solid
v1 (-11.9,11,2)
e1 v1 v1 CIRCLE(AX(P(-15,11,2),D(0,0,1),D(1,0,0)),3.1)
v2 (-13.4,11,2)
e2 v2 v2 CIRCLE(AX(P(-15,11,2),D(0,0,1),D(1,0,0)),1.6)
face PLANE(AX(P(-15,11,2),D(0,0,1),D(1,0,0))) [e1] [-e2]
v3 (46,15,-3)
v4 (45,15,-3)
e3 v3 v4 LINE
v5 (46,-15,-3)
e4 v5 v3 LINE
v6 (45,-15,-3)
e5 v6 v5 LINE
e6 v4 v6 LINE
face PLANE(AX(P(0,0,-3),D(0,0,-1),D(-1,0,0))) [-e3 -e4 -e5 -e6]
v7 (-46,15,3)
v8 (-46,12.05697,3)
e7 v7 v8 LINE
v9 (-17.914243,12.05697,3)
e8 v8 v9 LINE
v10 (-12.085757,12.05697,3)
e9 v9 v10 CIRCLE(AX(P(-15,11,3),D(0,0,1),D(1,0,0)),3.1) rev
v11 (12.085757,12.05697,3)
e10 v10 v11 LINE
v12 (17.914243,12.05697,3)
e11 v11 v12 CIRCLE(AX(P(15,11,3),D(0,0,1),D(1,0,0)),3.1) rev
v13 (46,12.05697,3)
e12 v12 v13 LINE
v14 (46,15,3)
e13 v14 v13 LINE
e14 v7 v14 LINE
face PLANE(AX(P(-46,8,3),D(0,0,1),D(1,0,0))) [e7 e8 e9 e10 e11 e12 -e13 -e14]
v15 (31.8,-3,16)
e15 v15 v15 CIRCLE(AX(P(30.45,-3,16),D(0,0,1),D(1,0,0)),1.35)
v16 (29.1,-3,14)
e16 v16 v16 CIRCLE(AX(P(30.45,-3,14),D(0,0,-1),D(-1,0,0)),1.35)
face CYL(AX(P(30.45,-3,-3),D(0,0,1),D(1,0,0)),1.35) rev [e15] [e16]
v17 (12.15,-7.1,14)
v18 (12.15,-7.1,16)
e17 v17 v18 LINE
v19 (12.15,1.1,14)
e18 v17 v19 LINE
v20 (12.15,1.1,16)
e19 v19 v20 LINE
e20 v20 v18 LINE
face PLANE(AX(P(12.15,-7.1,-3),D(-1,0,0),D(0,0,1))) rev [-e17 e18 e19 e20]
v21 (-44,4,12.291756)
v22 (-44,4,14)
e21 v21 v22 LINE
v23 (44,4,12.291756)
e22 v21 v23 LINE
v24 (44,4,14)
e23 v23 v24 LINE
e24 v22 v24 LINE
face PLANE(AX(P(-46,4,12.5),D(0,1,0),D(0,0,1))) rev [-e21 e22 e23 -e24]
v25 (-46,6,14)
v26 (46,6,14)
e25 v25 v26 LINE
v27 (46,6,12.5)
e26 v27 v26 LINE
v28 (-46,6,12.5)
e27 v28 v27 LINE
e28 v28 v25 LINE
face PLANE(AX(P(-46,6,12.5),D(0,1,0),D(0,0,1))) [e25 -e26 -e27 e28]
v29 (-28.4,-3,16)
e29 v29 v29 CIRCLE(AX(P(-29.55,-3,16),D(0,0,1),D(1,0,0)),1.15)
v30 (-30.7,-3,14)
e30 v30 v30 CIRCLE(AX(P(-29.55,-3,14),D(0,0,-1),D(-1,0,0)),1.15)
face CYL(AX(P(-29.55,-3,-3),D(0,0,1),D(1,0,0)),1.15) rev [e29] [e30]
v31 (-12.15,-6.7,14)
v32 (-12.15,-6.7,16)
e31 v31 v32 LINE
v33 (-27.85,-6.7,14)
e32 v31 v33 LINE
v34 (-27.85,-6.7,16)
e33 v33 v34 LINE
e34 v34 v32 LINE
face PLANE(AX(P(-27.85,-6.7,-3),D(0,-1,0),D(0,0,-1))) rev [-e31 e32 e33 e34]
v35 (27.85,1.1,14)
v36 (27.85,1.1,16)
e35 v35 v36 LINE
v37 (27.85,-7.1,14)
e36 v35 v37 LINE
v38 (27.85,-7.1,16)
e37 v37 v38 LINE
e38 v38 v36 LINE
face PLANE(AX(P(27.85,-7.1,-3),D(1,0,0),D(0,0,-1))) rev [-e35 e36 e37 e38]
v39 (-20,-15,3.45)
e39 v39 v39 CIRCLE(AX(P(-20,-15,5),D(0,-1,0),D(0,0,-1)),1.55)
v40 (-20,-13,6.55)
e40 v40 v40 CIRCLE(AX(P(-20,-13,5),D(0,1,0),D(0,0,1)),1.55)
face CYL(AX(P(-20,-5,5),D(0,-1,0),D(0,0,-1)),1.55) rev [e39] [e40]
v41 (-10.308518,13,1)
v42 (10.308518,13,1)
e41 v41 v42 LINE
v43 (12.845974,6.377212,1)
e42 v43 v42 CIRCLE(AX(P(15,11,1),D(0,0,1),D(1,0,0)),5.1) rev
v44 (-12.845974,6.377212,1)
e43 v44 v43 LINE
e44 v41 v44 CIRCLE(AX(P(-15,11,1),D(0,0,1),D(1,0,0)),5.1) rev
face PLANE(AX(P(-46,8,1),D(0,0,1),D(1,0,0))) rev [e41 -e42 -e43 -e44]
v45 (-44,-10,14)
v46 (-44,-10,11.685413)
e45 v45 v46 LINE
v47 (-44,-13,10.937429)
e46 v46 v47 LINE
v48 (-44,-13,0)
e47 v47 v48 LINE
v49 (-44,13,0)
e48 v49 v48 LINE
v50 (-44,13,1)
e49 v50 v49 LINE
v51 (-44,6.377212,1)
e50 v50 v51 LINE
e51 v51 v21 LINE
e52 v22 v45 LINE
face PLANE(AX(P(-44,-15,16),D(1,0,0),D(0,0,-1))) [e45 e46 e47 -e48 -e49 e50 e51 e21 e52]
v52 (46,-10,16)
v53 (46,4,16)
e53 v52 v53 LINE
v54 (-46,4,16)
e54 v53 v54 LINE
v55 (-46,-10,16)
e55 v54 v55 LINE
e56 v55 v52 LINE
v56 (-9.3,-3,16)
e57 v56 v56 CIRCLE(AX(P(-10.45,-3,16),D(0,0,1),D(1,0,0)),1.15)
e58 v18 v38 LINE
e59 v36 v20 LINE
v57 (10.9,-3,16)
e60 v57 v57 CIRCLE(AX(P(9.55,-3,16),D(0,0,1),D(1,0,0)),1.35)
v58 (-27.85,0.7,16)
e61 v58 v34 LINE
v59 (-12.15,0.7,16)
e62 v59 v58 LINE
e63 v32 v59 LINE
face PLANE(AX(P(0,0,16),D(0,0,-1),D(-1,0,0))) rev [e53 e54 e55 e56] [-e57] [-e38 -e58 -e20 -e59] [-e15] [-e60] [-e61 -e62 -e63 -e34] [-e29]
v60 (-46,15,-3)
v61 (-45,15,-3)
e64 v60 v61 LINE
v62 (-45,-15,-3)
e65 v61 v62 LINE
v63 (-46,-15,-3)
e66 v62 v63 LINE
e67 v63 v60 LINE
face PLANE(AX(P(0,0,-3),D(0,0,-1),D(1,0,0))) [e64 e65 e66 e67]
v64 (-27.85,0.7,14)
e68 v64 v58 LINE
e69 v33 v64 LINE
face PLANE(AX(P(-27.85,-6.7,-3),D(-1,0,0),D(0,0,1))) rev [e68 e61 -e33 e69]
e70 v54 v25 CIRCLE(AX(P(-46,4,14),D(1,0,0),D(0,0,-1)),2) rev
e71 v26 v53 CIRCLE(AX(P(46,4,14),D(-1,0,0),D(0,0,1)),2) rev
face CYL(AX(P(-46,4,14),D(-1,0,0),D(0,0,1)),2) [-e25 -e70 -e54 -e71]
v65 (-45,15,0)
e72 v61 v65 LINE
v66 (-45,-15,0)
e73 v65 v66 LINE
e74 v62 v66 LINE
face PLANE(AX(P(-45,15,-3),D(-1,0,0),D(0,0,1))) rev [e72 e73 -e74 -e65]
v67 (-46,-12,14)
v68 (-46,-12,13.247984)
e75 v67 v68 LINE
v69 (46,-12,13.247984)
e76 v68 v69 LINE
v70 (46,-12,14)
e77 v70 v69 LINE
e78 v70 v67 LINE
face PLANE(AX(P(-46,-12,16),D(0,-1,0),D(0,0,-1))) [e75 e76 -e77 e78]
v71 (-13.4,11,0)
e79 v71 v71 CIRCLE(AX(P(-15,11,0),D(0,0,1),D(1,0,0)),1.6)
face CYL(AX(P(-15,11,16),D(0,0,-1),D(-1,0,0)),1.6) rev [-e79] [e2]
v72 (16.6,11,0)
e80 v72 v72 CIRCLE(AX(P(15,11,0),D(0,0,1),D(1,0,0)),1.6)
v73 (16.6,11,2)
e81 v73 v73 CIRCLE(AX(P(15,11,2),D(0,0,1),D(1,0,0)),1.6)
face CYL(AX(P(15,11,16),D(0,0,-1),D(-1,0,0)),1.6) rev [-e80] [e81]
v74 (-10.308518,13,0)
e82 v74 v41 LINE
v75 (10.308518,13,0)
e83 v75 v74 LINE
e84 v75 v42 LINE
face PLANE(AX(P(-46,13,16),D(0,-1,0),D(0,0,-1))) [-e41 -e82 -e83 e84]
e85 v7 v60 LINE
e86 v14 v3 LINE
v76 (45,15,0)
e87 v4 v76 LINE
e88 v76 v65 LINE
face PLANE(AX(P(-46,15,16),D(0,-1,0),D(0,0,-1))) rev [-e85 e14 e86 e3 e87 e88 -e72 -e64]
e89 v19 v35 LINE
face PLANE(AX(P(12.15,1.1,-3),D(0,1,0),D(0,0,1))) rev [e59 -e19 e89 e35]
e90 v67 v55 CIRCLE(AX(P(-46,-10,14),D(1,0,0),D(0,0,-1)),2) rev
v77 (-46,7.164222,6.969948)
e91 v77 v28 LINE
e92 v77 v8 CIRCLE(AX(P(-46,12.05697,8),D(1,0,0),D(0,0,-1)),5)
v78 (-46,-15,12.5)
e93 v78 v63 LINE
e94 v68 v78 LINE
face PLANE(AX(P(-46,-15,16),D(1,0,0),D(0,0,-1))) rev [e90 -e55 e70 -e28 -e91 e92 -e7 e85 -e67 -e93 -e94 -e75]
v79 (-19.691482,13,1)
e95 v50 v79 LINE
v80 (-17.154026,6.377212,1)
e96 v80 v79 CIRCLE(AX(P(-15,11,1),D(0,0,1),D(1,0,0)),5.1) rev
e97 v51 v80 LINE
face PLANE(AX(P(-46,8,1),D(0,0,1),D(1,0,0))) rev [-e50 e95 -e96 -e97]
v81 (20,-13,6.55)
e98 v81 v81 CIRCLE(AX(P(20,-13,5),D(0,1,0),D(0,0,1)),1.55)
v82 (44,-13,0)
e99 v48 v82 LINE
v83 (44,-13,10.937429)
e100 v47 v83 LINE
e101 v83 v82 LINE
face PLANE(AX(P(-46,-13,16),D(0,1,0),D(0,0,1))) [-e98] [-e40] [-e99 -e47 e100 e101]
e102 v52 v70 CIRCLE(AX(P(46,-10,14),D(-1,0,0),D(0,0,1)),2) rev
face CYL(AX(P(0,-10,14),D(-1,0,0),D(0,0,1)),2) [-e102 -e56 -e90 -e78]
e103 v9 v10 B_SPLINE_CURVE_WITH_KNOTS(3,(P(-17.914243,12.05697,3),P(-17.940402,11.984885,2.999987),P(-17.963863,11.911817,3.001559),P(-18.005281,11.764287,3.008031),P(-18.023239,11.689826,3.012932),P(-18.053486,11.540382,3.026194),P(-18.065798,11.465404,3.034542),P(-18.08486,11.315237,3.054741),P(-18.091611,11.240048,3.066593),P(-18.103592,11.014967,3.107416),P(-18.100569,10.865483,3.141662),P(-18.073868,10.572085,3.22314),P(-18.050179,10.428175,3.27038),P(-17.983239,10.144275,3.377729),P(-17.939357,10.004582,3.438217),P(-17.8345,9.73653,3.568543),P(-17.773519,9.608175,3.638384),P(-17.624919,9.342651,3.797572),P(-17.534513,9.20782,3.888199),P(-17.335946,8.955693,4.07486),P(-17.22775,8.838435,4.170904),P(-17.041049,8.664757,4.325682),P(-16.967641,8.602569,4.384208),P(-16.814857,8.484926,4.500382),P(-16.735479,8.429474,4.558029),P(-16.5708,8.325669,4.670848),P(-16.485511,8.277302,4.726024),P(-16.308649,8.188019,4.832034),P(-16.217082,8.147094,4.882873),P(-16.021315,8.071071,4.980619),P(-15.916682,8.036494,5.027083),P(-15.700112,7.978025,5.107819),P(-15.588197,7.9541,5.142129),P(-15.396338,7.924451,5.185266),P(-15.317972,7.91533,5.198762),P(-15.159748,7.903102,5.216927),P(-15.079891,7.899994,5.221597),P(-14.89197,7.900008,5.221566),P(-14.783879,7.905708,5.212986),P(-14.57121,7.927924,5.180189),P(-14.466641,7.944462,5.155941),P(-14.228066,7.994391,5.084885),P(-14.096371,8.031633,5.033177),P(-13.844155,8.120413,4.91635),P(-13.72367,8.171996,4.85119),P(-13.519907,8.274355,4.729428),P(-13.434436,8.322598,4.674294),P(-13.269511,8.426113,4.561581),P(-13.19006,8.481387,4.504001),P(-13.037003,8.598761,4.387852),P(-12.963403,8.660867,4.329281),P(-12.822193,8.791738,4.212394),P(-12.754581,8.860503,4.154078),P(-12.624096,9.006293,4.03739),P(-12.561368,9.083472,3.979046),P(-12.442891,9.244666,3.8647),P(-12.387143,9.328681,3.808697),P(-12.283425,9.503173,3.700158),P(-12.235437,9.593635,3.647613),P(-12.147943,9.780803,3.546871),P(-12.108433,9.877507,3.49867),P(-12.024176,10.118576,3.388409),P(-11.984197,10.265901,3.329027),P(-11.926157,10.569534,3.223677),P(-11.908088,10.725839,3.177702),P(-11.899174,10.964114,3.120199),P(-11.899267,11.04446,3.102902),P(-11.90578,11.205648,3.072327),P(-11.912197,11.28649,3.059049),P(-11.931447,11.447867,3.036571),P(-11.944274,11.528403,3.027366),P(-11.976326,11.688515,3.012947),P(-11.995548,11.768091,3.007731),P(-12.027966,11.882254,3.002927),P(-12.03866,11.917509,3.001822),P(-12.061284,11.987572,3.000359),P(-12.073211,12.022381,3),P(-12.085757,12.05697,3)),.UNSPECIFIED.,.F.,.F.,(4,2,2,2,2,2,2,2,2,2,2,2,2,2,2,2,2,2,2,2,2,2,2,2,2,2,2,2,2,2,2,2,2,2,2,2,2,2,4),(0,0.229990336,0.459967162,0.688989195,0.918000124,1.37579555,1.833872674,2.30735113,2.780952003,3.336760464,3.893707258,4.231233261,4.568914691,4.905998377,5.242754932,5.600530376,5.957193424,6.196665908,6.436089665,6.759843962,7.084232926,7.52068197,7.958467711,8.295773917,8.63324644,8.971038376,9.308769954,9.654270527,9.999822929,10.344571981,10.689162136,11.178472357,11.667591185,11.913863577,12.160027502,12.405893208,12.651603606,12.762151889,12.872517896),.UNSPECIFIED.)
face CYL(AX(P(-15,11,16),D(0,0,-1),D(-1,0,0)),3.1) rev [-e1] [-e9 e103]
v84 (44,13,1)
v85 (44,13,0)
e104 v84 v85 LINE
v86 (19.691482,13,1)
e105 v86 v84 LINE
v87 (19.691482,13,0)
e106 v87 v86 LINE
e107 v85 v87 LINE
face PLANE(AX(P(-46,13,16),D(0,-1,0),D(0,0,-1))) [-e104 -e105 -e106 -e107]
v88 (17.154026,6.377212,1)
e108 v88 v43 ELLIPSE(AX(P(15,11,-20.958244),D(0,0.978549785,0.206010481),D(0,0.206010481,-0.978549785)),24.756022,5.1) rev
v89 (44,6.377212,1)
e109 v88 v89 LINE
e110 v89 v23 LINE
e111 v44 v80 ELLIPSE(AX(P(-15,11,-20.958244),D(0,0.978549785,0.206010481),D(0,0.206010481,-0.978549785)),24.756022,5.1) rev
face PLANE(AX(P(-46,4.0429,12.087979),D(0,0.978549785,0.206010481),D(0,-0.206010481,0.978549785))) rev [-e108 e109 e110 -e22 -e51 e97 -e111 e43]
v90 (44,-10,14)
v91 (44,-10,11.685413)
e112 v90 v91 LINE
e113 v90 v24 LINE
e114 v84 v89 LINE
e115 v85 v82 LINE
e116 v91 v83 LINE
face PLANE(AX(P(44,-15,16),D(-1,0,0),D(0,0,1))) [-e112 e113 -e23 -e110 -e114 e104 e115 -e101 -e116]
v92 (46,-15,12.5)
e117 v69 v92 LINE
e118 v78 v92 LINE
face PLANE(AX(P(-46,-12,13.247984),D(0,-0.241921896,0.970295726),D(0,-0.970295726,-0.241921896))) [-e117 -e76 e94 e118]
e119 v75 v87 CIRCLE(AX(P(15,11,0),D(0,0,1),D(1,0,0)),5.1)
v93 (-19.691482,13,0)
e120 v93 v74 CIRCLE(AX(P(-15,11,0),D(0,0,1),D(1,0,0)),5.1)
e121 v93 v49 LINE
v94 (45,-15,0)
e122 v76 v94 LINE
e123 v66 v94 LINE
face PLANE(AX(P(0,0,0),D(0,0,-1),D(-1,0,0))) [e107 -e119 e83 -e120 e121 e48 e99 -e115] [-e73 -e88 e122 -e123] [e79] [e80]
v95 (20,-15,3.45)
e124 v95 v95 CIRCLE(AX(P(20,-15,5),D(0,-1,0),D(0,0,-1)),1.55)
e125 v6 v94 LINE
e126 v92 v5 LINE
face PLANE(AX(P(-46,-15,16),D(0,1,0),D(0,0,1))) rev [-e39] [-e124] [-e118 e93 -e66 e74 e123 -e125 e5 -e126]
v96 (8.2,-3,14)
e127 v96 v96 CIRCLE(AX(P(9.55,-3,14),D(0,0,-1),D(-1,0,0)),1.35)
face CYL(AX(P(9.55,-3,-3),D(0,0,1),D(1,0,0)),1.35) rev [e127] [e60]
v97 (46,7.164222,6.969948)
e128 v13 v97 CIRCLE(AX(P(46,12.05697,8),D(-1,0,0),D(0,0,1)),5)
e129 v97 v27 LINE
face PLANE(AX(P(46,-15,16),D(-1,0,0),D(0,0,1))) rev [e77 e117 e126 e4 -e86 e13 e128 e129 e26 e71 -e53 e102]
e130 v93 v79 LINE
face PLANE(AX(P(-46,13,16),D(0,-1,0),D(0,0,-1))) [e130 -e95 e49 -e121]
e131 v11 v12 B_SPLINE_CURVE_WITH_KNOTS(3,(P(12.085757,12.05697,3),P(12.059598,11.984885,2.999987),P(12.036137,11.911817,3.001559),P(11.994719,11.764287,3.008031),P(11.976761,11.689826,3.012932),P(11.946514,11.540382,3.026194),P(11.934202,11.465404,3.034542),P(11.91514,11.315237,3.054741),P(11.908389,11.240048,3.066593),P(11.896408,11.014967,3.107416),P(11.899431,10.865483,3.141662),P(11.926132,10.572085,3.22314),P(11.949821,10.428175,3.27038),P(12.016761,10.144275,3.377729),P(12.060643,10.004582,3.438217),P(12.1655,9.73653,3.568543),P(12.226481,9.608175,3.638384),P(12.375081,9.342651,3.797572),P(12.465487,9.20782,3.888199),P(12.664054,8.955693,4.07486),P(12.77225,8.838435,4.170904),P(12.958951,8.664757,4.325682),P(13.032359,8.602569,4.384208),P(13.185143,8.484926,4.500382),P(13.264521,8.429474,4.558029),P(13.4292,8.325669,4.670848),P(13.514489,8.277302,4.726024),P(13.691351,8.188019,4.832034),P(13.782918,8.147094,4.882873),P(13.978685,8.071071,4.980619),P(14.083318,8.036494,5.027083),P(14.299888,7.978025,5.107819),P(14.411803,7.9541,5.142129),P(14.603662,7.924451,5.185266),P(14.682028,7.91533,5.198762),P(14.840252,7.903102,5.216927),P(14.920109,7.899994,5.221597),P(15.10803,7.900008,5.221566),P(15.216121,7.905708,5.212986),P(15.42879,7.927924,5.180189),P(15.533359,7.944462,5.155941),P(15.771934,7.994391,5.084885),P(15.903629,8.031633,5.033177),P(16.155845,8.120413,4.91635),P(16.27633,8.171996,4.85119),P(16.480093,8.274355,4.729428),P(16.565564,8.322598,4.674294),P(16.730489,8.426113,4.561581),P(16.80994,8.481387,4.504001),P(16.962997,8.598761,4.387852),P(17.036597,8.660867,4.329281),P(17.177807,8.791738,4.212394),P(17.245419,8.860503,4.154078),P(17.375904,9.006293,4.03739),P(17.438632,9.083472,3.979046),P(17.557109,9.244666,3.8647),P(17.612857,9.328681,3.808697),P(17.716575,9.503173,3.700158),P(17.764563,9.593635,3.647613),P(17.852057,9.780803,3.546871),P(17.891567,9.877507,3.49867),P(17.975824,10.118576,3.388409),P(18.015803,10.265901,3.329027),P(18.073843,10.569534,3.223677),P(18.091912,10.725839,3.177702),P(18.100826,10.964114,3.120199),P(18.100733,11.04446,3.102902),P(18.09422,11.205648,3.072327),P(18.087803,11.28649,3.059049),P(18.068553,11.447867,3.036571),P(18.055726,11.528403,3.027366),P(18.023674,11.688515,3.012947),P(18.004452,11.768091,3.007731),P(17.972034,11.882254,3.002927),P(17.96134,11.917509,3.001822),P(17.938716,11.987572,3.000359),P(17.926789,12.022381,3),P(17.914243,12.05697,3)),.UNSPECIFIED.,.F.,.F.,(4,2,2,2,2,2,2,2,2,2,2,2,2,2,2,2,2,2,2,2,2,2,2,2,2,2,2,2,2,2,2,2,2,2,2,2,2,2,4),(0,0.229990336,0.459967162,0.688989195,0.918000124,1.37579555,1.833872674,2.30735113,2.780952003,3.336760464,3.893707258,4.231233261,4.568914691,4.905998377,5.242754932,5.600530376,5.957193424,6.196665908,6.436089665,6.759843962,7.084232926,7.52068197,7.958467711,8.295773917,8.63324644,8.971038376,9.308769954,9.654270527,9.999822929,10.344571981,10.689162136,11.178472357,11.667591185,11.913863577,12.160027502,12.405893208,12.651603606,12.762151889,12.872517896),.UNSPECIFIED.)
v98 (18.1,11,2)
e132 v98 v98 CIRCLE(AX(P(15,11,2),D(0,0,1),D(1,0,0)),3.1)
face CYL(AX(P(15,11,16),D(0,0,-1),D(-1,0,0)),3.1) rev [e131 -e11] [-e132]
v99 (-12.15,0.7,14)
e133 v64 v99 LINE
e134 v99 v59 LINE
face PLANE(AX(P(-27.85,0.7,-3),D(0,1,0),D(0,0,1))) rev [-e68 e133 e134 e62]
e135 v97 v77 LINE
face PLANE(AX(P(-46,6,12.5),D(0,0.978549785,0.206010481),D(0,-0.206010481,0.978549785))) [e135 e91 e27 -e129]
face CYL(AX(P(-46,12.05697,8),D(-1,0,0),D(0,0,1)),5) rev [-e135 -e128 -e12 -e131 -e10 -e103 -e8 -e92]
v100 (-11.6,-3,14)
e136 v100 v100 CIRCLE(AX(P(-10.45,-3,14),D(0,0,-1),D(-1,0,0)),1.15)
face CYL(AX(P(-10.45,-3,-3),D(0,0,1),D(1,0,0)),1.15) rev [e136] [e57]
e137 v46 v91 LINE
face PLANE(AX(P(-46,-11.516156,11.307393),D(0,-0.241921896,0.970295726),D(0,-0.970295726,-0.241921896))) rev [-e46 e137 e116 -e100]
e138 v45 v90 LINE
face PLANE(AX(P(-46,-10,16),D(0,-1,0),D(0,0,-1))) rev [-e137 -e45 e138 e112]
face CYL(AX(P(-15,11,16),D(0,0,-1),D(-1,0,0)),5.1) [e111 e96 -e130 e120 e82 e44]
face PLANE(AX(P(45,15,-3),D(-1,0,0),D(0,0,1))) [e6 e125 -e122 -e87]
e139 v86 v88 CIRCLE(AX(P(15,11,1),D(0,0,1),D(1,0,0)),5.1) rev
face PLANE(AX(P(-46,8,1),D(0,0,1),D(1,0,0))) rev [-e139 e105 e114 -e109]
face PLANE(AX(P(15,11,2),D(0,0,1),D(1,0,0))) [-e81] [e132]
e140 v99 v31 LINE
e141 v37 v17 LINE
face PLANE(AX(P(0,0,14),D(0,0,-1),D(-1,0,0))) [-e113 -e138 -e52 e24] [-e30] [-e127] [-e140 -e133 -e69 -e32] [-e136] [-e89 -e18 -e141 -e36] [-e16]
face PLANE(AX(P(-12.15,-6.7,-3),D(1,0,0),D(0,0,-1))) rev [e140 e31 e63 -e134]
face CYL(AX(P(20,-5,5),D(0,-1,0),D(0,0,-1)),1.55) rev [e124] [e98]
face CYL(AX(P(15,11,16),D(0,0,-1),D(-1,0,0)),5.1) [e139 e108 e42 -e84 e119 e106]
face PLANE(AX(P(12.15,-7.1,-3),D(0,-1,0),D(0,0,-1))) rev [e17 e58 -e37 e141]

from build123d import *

# Parameters (mm, degrees)
SKETCH2_W               = 92
SKETCH2_H               = 30
BOSS_EXTRUDE1_DEPTH     = 16
SKETCH3_W               = 1
SKETCH3_H               = 30
BOSS_EXTRUDE2_DEPTH     = 3
SKETCH6_OUTSIDE_W       = 40.724
SKETCH6_OUTSIDE_H       = 51.724
CUT_EXTRUDE1_DEPTH      = 95.578010129
SKETCH7_R               = 1.6
CUT_EXTRUDE2_DEPTH      = 51.960769225
CUT_EXTRUDE3_DEPTH      = 51.0999002
CUT_EXTRUDE3_DEPTH_BACK = 1
SKETCH8_R               = 3.1
SHELL3_OUTLINE_W        = 88
SHELL3_OUTLINE_H        = 14
SHELL3_DEPTH            = 14
SHELL3_2_OUTLINE_W      = 88
SHELL3_2_OUTLINE_H      = 3
SHELL3_2_DEPTH          = 10.937428747
SHELL3_3_DEPTH          = 1
SHELL3_START            = -44
SHELL3_4_DEPTH          = 88
SHELL3_START_2          = 1
SHELL3_5_DEPTH          = 2.266756081
SKETCH9_R               = 1.35
SKETCH9_W               = 15.7
SKETCH9_H               = 8.2
CUT_EXTRUDE4_DEPTH      = 52.980765673
SKETCH10_R              = 1.15
SKETCH10_W              = 15.7
SKETCH10_H              = 7.4
CUT_EXTRUDE5_DEPTH      = 52.980765673
SKETCH11_R              = 1.55
CUT_EXTRUDE6_DEPTH      = 10
FILLET1_R               = 2
FILLET3_R               = 5


with BuildPart() as part:
    # Sketch2 → Boss-Extrude1 (new body)
    with BuildSketch(Plane.XY):
        Rectangle(SKETCH2_W, SKETCH2_H)
    extrude(amount=BOSS_EXTRUDE1_DEPTH)

    # Sketch3 → Boss-Extrude2 (add)
    with BuildSketch(Plane.XY):
        with Locations((45.5, 0)):
            Rectangle(SKETCH3_W, SKETCH3_H)
    boss_extrude2 = extrude(amount=-BOSS_EXTRUDE2_DEPTH)

    # Mirror1: Boss-Extrude2 across plane
    add(boss_extrude2.mirror(Plane(origin=(0, 0, 0), x_dir=(0, 0, 1), z_dir=(1, 0, 0))))

    # Sketch6 outside → Cut-Extrude1 (cut, through all)
    with BuildSketch(Plane(origin=(46, 0, 0), x_dir=(0, 0, -1), z_dir=(1, 0, 0))):
        with Locations((-6.5, 0)):
            Rectangle(SKETCH6_OUTSIDE_W, SKETCH6_OUTSIDE_H)
        Polygon((-12.5, 6), (-16, 6), (-16, -12), (-13.247984009, -12), (-12.5, -15), (3, -15), (3, 15), (-3, 15), (-3, 8), align=None, mode=Mode.SUBTRACT)
    extrude(amount=-CUT_EXTRUDE1_DEPTH, mode=Mode.SUBTRACT)

    # Sketch7 → Cut-Extrude2 (cut, through all)
    with BuildSketch(Plane.XY):
        with Locations((-15, 11)):
            Circle(SKETCH7_R)
        with Locations((15, 11)):
            Circle(SKETCH7_R)
    extrude(amount=CUT_EXTRUDE2_DEPTH, mode=Mode.SUBTRACT)

    # Sketch8 → Cut-Extrude3 (cut, two sides: drawn at the far end of the back side and taken through both)
    with BuildSketch(Plane.XY.offset(3).offset(-CUT_EXTRUDE3_DEPTH_BACK)):
        with Locations(Location((15, 11, 0), (0, 0, 255.407449398))):
            Circle(SKETCH8_R)
        with Locations(Location((-15, 11, 0), (0, 0, 255.407449398))):
            Circle(SKETCH8_R)
    extrude(amount=CUT_EXTRUDE3_DEPTH + CUT_EXTRUDE3_DEPTH_BACK, mode=Mode.SUBTRACT)

    # Shell3: read off the stored shape, not the designer's step
    # Shell3 outline → Shell3 (cut)
    with BuildSketch(Plane.XY):
        with Locations((0, -3)):
            Rectangle(SHELL3_OUTLINE_W, SHELL3_OUTLINE_H)
    extrude(amount=SHELL3_DEPTH, mode=Mode.SUBTRACT)

    # Shell3 2 outline → Shell3 2 (cut)
    with BuildSketch(Plane.XY):
        with Locations((0, -11.5)):
            Rectangle(SHELL3_2_OUTLINE_W, SHELL3_2_OUTLINE_H)
    extrude(amount=SHELL3_2_DEPTH, mode=Mode.SUBTRACT)

    # Shell3 3 outline → Shell3 3 (cut)
    with BuildSketch(Plane.XY):
        with BuildLine():
            Line((-19.691481642, 13), (-44, 13))
            Line((-44, 13), (-44, 4))
            Line((-44, 4), (44, 4))
            Line((44, 4), (44, 13))
            Line((44, 13), (19.691481642, 13))
            ThreePointArc((19.691481642, 13), (15, 5.9), (10.308518358, 13))
            Line((10.308518358, 13), (-10.308518358, 13))
            ThreePointArc((-10.308518358, 13), (-15, 5.9), (-19.691481642, 13))
        make_face()
    extrude(amount=SHELL3_3_DEPTH, mode=Mode.SUBTRACT)

    # Shell3 4 outline → Shell3 4 (cut)
    with BuildSketch(Plane.YZ.offset(SHELL3_START)):
        Polygon((4, 1), (6.377211806, 1), (4, 12.291756081), align=None)
        Polygon((-10, 10.937428747), (-10, 11.685412756), (-13, 10.937428747), align=None)
    extrude(amount=SHELL3_4_DEPTH, mode=Mode.SUBTRACT)

    # Shell3 5 outline → Shell3 5 (add)
    with BuildSketch(Plane.XY.offset(SHELL3_START_2)):
        with BuildLine():
            Line((17.154026303, 6.377211806), (12.845973697, 6.377211806))
            ThreePointArc((12.845973697, 6.377211806), (15, 5.9), (17.154026303, 6.377211806))
        make_face()
        with BuildLine():
            ThreePointArc((-17.154026303, 6.377211806), (-15, 5.9), (-12.845973697, 6.377211806))
            Line((-12.845973697, 6.377211806), (-17.154026303, 6.377211806))
        make_face()
    extrude(amount=SHELL3_5_DEPTH)

    # Sketch9 → Cut-Extrude4 (cut, through all)
    with BuildSketch(Plane.XY.offset(16)):
        with Locations((9.55, -3)):
            Circle(SKETCH9_R)
        with Locations((30.45, -3)):
            Circle(SKETCH9_R)
        with Locations((20, -3)):
            Rectangle(SKETCH9_W, SKETCH9_H)
    extrude(amount=-CUT_EXTRUDE4_DEPTH, mode=Mode.SUBTRACT)

    # Sketch10 → Cut-Extrude5 (cut, through all)
    with BuildSketch(Plane.XY.offset(16)):
        with Locations((-29.55, -3)):
            Circle(SKETCH10_R)
        with Locations((-10.45, -3)):
            Circle(SKETCH10_R)
        with Locations((-20, -3)):
            Rectangle(SKETCH10_W, SKETCH10_H)
    extrude(amount=-CUT_EXTRUDE5_DEPTH, mode=Mode.SUBTRACT)

    # Sketch11 → Cut-Extrude6 (cut)
    with BuildSketch(Plane.XZ.offset(15)):
        with Locations(Location((-20, 5, 0), (0, 0, 270))):
            Circle(SKETCH11_R)
        with Locations(Location((20, 5, 0), (0, 0, 270))):
            Circle(SKETCH11_R)
    extrude(amount=-CUT_EXTRUDE6_DEPTH, mode=Mode.SUBTRACT)

    # Fillet1
    fillet1_edges = [part.edges().sort_by_distance(p)[0] for p in [
        (0, -12, 16),
        (0, 6, 16),
    ]]
    fillet(fillet1_edges, radius=FILLET1_R)

    # Fillet3
    # the kernel refuses this fillet: 5 mm, written as the material it adds along each edge
    with BuildSketch(Plane(origin=(24.361401242, 8, 3), x_dir=(0, -0.20601048104984168, 0.978549784986749), z_dir=(-1, 0, 0))) as fillet3_piece_1_section:
        with BuildLine():
            CenterArc((FILLET3_R * 0.811394096787, FILLET3_R), FILLET3_R, 191.88865804, 78.11134196)
            Line((-FILLET3_R * 0.1671556882, FILLET3_R * 0.79398951895), (0, 0))
            Line((0, 0), (FILLET3_R * 0.811394096787, 0))
        make_face()
    fillet3_piece_1 = extrude(amount=48.722802484, mode=Mode.PRIVATE)
    fillet3_piece_1 = fillet3_piece_1 - Plane(origin=(-15, 11, 3), x_dir=(-0.2519435379319081, -0.967741935484018, 0), z_dir=(0, 0, -1)) * Cylinder(3.1, 114, mode=Mode.PRIVATE)
    fillet3_piece_1 = fillet3_piece_1 - Plane(origin=(15, 11, 3), x_dir=(-0.2519435379319081, -0.967741935484018, 0), z_dir=(0, 0, -1)) * Cylinder(3.1, 114, mode=Mode.PRIVATE)
    add(fillet3_piece_1)
    with BuildSketch(Plane(origin=(46, 8, 3), x_dir=(0, -0.20601048104984168, 0.978549784986749), z_dir=(-1, 0, 0))) as fillet3_piece_2_section:
        with BuildLine():
            CenterArc((FILLET3_R * 0.811394096787, FILLET3_R), FILLET3_R, 191.88865804, 78.11134196)
            Line((-FILLET3_R * 0.1671556882, FILLET3_R * 0.79398951895), (0, 0))
            Line((0, 0), (FILLET3_R * 0.811394096787, 0))
        make_face()
    fillet3_piece_2 = extrude(amount=40.361401242, mode=Mode.PRIVATE)
    fillet3_piece_2 = fillet3_piece_2 - Plane(origin=(15, 11, 3), x_dir=(-0.2519435379319081, -0.967741935484018, 0), z_dir=(0, 0, -1)) * Cylinder(3.1, 97, mode=Mode.PRIVATE)
    add(fillet3_piece_2)
    with BuildSketch(Plane(origin=(-5.638598758, 8, 3), x_dir=(0, -0.20601048104984168, 0.978549784986749), z_dir=(-1, 0, 0))) as fillet3_piece_3_section:
        with BuildLine():
            CenterArc((FILLET3_R * 0.811394096787, FILLET3_R), FILLET3_R, 191.88865804, 78.11134196)
            Line((-FILLET3_R * 0.1671556882, FILLET3_R * 0.79398951895), (0, 0))
            Line((0, 0), (FILLET3_R * 0.811394096787, 0))
        make_face()
    fillet3_piece_3 = extrude(amount=40.361401242, mode=Mode.PRIVATE)
    fillet3_piece_3 = fillet3_piece_3 - Plane(origin=(-15, 11, 3), x_dir=(-0.2519435379319081, -0.967741935484018, 0), z_dir=(0, 0, -1)) * Cylinder(3.1, 97, mode=Mode.PRIVATE)
    add(fillet3_piece_3)


solid = part.part
